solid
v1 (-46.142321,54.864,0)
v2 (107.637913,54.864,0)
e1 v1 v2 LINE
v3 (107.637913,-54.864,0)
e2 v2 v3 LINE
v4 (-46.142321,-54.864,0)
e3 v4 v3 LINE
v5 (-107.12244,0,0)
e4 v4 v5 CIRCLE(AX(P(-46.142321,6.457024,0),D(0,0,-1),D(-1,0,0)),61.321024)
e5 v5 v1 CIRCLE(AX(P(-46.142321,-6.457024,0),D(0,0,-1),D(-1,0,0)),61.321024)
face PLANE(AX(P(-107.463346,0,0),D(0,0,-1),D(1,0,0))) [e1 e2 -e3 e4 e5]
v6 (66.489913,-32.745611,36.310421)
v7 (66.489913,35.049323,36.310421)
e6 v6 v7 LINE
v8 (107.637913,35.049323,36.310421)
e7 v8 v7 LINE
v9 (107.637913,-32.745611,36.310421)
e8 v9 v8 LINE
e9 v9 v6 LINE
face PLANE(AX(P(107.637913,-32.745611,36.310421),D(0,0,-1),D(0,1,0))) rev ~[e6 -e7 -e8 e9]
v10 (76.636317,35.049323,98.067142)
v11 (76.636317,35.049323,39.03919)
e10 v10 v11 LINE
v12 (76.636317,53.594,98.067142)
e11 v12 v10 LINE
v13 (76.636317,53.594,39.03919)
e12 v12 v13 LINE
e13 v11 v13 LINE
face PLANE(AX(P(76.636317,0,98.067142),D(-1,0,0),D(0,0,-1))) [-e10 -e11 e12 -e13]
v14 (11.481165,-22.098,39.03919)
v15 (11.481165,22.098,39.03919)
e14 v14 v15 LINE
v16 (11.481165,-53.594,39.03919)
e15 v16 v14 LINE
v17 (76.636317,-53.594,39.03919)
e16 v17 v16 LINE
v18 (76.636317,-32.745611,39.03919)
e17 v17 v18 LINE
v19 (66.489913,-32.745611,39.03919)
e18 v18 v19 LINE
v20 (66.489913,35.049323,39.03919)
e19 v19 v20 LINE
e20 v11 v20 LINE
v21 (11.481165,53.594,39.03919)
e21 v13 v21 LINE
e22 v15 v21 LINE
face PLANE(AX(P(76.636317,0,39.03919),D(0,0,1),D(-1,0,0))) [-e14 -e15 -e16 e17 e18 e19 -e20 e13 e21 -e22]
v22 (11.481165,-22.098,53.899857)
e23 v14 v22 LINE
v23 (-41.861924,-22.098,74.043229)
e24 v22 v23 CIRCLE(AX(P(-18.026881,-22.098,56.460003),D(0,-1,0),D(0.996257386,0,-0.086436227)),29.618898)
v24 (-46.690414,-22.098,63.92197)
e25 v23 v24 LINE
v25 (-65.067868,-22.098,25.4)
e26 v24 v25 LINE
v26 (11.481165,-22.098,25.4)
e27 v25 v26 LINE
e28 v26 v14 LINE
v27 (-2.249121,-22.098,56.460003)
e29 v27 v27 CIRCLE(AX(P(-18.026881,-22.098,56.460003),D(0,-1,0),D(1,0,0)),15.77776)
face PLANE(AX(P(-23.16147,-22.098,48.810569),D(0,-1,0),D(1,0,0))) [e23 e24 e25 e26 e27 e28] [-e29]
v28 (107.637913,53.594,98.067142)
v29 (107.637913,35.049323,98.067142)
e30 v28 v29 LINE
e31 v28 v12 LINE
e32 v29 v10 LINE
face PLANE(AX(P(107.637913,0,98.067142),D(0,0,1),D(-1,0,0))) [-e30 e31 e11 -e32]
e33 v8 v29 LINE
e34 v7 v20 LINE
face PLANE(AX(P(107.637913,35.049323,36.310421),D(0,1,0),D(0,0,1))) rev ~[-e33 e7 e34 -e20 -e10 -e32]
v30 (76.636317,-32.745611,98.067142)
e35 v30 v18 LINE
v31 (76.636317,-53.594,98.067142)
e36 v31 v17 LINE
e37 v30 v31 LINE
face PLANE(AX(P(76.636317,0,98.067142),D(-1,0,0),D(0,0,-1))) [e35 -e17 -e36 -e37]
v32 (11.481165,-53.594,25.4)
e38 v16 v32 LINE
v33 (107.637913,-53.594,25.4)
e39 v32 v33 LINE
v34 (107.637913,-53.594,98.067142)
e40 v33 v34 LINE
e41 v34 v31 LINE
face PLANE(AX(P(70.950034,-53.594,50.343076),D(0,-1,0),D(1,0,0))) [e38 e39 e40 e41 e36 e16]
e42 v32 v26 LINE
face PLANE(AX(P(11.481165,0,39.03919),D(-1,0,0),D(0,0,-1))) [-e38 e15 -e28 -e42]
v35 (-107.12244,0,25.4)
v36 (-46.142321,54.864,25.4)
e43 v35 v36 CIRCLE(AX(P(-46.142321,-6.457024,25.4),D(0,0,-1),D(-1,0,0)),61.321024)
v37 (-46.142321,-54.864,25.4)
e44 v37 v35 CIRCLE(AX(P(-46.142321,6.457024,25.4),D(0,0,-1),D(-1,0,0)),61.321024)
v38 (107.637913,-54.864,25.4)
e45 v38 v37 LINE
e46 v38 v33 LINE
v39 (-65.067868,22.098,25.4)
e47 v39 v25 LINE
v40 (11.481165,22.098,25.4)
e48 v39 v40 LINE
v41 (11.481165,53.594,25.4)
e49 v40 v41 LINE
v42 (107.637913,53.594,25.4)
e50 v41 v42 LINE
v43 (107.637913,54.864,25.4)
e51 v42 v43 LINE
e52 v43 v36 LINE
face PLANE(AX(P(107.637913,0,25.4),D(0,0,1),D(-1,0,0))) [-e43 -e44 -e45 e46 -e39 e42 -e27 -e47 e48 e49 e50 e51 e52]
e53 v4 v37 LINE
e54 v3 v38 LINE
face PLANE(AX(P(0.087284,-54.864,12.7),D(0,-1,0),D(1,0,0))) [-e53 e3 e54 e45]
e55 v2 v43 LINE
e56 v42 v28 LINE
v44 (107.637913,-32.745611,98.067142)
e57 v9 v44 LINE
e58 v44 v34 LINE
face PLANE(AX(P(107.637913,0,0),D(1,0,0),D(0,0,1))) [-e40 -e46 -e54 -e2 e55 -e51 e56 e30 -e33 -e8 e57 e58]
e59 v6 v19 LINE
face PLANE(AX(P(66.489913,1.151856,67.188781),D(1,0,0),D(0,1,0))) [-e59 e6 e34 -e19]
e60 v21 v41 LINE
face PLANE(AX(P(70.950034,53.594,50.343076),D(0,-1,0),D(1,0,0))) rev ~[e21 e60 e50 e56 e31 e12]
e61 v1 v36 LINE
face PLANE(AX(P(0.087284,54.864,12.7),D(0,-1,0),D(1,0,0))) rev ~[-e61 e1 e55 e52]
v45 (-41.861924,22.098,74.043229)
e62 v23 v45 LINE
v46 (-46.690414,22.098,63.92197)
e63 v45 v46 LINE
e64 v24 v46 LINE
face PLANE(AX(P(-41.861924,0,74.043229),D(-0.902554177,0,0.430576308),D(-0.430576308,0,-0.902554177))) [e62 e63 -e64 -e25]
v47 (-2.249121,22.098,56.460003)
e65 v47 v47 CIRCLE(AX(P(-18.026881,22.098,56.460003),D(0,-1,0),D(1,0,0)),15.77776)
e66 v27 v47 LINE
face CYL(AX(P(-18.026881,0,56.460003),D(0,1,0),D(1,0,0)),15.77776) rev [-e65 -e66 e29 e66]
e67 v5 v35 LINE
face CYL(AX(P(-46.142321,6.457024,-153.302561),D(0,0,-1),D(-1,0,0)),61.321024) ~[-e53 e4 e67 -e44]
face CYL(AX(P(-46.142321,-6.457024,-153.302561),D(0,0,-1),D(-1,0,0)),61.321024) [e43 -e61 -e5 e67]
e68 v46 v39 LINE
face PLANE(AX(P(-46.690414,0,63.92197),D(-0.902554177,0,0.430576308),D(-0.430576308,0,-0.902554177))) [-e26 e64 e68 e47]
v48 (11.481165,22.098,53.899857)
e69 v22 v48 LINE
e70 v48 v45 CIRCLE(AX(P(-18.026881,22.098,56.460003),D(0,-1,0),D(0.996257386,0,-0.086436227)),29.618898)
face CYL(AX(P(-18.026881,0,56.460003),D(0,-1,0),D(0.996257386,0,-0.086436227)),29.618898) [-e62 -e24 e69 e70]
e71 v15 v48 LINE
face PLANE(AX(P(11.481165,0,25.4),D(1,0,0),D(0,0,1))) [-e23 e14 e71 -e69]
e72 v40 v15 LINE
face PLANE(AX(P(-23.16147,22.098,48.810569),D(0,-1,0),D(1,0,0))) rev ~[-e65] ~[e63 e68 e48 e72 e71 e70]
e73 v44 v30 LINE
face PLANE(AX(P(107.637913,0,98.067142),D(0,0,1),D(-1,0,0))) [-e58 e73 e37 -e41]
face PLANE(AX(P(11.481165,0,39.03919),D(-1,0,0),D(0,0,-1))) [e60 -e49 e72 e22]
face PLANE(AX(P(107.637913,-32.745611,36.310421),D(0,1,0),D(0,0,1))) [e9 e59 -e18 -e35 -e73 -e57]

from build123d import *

# Parameters (mm, degrees)
F1_DEPTH    = 54.864
F0_R        = 15.7777597409
F2_DEPTH    = 22.098
F3_DEPTH    = 53.594
F4_T1_DEPTH = 332.0051224214
F5_DEPTH    = 131.826
F6_W        = 67.7949339151
F6_H        = 61.7567202186
F7_DEPTH    = 41.148


# Not quite as in the source:
# - a fillet or chamfer that OpenCascade refuses, or shapes differently, is made with other operations: its cross-section is extruded or revolved along the edge and cut away or added


with BuildPart() as f1:
    # F0 (on Front) → F1 (new body, symmetric)
    with BuildSketch(Plane.XZ):
        Polygon((-107.4633456931, 25.4), (-107.4633456931, 0), (107.6379133128, 0), (107.6379133128, 25.4), (11.4811650322, 25.4), (-65.0678679326, 25.4), align=None)
    extrude(amount=F1_DEPTH, both=True)

    # F0 (on Front) → F2 (join, symmetric)
    with BuildSketch(Plane.XZ):
        with BuildLine():
            Line((-46.6904140055, 63.9219704105), (-65.0678679326, 25.4))
            Line((-65.0678679326, 25.4), (11.4811650322, 25.4))
            Line((11.4811650322, 25.4), (11.4811650322, 39.0391899168))
            Line((11.4811650322, 39.0391899168), (11.4811650322, 53.899857424))
            ThreePointArc((11.4811650322, 53.899857424), (-7.5633921192, 84.1691084188), (-41.8619237654, 74.0432287141))
            Line((-41.8619237654, 74.0432287141), (-46.6904140055, 63.9219704105))
        make_face()
        with Locations((-18.0268805863, 56.4600032051)):
            Circle(F0_R, mode=Mode.SUBTRACT)
    extrude(amount=F2_DEPTH, both=True)

    # F0 (on Front) → F3 (join, symmetric)
    with BuildSketch(Plane.XZ):
        Polygon((11.4811650322, 25.4), (107.6379133128, 25.4), (107.6379133128, 98.0671415215), (76.6363167746, 98.0671415215), (76.6363167746, 39.0391899168), (11.4811650322, 39.0391899168), align=None)
    extrude(amount=F3_DEPTH, both=True)

    # F4: fillet of radius 61.3210244843 on 2 edges, made by hand

    # F4_s2 → F4_t1 (cut)
    with BuildSketch(Plane.XY.offset(-153.3025612107)):
        with BuildLine():
            ThreePointArc((-107.4633456931, -6.4570244843), (-89.502833451, 36.9034877579), (-46.1423212089, 54.864))
            Line((-46.1423212089, 54.864), (-107.4633456931, 54.864))
            Line((-107.4633456931, 54.864), (-107.4633456931, -6.4570244843))
        make_face()
        with BuildLine():
            ThreePointArc((-107.4633456931, 6.4570244843), (-89.502833451, -36.9034877579), (-46.1423212089, -54.864))
            Line((-46.1423212089, -54.864), (-107.4633456931, -54.864))
            Line((-107.4633456931, -54.864), (-107.4633456931, 6.4570244843))
        make_face()
    extrude(amount=F4_T1_DEPTH, mode=Mode.SUBTRACT)

    # F0 (on Front) → F5 (cut)
    with BuildSketch(Plane.XZ):
        with Locations((-18.0268805863, 56.4600032051)):
            Circle(F0_R)
    extrude(amount=-F5_DEPTH, mode=Mode.SUBTRACT)

    # F6 (on face) → F7 (cut)
    with BuildSketch(Plane.YZ.offset(107.6379133128)):
        with Locations((1.151856035, 67.1887814122)):
            Rectangle(F6_W, F6_H)
    extrude(amount=-F7_DEPTH, mode=Mode.SUBTRACT)


solid = f1.part
